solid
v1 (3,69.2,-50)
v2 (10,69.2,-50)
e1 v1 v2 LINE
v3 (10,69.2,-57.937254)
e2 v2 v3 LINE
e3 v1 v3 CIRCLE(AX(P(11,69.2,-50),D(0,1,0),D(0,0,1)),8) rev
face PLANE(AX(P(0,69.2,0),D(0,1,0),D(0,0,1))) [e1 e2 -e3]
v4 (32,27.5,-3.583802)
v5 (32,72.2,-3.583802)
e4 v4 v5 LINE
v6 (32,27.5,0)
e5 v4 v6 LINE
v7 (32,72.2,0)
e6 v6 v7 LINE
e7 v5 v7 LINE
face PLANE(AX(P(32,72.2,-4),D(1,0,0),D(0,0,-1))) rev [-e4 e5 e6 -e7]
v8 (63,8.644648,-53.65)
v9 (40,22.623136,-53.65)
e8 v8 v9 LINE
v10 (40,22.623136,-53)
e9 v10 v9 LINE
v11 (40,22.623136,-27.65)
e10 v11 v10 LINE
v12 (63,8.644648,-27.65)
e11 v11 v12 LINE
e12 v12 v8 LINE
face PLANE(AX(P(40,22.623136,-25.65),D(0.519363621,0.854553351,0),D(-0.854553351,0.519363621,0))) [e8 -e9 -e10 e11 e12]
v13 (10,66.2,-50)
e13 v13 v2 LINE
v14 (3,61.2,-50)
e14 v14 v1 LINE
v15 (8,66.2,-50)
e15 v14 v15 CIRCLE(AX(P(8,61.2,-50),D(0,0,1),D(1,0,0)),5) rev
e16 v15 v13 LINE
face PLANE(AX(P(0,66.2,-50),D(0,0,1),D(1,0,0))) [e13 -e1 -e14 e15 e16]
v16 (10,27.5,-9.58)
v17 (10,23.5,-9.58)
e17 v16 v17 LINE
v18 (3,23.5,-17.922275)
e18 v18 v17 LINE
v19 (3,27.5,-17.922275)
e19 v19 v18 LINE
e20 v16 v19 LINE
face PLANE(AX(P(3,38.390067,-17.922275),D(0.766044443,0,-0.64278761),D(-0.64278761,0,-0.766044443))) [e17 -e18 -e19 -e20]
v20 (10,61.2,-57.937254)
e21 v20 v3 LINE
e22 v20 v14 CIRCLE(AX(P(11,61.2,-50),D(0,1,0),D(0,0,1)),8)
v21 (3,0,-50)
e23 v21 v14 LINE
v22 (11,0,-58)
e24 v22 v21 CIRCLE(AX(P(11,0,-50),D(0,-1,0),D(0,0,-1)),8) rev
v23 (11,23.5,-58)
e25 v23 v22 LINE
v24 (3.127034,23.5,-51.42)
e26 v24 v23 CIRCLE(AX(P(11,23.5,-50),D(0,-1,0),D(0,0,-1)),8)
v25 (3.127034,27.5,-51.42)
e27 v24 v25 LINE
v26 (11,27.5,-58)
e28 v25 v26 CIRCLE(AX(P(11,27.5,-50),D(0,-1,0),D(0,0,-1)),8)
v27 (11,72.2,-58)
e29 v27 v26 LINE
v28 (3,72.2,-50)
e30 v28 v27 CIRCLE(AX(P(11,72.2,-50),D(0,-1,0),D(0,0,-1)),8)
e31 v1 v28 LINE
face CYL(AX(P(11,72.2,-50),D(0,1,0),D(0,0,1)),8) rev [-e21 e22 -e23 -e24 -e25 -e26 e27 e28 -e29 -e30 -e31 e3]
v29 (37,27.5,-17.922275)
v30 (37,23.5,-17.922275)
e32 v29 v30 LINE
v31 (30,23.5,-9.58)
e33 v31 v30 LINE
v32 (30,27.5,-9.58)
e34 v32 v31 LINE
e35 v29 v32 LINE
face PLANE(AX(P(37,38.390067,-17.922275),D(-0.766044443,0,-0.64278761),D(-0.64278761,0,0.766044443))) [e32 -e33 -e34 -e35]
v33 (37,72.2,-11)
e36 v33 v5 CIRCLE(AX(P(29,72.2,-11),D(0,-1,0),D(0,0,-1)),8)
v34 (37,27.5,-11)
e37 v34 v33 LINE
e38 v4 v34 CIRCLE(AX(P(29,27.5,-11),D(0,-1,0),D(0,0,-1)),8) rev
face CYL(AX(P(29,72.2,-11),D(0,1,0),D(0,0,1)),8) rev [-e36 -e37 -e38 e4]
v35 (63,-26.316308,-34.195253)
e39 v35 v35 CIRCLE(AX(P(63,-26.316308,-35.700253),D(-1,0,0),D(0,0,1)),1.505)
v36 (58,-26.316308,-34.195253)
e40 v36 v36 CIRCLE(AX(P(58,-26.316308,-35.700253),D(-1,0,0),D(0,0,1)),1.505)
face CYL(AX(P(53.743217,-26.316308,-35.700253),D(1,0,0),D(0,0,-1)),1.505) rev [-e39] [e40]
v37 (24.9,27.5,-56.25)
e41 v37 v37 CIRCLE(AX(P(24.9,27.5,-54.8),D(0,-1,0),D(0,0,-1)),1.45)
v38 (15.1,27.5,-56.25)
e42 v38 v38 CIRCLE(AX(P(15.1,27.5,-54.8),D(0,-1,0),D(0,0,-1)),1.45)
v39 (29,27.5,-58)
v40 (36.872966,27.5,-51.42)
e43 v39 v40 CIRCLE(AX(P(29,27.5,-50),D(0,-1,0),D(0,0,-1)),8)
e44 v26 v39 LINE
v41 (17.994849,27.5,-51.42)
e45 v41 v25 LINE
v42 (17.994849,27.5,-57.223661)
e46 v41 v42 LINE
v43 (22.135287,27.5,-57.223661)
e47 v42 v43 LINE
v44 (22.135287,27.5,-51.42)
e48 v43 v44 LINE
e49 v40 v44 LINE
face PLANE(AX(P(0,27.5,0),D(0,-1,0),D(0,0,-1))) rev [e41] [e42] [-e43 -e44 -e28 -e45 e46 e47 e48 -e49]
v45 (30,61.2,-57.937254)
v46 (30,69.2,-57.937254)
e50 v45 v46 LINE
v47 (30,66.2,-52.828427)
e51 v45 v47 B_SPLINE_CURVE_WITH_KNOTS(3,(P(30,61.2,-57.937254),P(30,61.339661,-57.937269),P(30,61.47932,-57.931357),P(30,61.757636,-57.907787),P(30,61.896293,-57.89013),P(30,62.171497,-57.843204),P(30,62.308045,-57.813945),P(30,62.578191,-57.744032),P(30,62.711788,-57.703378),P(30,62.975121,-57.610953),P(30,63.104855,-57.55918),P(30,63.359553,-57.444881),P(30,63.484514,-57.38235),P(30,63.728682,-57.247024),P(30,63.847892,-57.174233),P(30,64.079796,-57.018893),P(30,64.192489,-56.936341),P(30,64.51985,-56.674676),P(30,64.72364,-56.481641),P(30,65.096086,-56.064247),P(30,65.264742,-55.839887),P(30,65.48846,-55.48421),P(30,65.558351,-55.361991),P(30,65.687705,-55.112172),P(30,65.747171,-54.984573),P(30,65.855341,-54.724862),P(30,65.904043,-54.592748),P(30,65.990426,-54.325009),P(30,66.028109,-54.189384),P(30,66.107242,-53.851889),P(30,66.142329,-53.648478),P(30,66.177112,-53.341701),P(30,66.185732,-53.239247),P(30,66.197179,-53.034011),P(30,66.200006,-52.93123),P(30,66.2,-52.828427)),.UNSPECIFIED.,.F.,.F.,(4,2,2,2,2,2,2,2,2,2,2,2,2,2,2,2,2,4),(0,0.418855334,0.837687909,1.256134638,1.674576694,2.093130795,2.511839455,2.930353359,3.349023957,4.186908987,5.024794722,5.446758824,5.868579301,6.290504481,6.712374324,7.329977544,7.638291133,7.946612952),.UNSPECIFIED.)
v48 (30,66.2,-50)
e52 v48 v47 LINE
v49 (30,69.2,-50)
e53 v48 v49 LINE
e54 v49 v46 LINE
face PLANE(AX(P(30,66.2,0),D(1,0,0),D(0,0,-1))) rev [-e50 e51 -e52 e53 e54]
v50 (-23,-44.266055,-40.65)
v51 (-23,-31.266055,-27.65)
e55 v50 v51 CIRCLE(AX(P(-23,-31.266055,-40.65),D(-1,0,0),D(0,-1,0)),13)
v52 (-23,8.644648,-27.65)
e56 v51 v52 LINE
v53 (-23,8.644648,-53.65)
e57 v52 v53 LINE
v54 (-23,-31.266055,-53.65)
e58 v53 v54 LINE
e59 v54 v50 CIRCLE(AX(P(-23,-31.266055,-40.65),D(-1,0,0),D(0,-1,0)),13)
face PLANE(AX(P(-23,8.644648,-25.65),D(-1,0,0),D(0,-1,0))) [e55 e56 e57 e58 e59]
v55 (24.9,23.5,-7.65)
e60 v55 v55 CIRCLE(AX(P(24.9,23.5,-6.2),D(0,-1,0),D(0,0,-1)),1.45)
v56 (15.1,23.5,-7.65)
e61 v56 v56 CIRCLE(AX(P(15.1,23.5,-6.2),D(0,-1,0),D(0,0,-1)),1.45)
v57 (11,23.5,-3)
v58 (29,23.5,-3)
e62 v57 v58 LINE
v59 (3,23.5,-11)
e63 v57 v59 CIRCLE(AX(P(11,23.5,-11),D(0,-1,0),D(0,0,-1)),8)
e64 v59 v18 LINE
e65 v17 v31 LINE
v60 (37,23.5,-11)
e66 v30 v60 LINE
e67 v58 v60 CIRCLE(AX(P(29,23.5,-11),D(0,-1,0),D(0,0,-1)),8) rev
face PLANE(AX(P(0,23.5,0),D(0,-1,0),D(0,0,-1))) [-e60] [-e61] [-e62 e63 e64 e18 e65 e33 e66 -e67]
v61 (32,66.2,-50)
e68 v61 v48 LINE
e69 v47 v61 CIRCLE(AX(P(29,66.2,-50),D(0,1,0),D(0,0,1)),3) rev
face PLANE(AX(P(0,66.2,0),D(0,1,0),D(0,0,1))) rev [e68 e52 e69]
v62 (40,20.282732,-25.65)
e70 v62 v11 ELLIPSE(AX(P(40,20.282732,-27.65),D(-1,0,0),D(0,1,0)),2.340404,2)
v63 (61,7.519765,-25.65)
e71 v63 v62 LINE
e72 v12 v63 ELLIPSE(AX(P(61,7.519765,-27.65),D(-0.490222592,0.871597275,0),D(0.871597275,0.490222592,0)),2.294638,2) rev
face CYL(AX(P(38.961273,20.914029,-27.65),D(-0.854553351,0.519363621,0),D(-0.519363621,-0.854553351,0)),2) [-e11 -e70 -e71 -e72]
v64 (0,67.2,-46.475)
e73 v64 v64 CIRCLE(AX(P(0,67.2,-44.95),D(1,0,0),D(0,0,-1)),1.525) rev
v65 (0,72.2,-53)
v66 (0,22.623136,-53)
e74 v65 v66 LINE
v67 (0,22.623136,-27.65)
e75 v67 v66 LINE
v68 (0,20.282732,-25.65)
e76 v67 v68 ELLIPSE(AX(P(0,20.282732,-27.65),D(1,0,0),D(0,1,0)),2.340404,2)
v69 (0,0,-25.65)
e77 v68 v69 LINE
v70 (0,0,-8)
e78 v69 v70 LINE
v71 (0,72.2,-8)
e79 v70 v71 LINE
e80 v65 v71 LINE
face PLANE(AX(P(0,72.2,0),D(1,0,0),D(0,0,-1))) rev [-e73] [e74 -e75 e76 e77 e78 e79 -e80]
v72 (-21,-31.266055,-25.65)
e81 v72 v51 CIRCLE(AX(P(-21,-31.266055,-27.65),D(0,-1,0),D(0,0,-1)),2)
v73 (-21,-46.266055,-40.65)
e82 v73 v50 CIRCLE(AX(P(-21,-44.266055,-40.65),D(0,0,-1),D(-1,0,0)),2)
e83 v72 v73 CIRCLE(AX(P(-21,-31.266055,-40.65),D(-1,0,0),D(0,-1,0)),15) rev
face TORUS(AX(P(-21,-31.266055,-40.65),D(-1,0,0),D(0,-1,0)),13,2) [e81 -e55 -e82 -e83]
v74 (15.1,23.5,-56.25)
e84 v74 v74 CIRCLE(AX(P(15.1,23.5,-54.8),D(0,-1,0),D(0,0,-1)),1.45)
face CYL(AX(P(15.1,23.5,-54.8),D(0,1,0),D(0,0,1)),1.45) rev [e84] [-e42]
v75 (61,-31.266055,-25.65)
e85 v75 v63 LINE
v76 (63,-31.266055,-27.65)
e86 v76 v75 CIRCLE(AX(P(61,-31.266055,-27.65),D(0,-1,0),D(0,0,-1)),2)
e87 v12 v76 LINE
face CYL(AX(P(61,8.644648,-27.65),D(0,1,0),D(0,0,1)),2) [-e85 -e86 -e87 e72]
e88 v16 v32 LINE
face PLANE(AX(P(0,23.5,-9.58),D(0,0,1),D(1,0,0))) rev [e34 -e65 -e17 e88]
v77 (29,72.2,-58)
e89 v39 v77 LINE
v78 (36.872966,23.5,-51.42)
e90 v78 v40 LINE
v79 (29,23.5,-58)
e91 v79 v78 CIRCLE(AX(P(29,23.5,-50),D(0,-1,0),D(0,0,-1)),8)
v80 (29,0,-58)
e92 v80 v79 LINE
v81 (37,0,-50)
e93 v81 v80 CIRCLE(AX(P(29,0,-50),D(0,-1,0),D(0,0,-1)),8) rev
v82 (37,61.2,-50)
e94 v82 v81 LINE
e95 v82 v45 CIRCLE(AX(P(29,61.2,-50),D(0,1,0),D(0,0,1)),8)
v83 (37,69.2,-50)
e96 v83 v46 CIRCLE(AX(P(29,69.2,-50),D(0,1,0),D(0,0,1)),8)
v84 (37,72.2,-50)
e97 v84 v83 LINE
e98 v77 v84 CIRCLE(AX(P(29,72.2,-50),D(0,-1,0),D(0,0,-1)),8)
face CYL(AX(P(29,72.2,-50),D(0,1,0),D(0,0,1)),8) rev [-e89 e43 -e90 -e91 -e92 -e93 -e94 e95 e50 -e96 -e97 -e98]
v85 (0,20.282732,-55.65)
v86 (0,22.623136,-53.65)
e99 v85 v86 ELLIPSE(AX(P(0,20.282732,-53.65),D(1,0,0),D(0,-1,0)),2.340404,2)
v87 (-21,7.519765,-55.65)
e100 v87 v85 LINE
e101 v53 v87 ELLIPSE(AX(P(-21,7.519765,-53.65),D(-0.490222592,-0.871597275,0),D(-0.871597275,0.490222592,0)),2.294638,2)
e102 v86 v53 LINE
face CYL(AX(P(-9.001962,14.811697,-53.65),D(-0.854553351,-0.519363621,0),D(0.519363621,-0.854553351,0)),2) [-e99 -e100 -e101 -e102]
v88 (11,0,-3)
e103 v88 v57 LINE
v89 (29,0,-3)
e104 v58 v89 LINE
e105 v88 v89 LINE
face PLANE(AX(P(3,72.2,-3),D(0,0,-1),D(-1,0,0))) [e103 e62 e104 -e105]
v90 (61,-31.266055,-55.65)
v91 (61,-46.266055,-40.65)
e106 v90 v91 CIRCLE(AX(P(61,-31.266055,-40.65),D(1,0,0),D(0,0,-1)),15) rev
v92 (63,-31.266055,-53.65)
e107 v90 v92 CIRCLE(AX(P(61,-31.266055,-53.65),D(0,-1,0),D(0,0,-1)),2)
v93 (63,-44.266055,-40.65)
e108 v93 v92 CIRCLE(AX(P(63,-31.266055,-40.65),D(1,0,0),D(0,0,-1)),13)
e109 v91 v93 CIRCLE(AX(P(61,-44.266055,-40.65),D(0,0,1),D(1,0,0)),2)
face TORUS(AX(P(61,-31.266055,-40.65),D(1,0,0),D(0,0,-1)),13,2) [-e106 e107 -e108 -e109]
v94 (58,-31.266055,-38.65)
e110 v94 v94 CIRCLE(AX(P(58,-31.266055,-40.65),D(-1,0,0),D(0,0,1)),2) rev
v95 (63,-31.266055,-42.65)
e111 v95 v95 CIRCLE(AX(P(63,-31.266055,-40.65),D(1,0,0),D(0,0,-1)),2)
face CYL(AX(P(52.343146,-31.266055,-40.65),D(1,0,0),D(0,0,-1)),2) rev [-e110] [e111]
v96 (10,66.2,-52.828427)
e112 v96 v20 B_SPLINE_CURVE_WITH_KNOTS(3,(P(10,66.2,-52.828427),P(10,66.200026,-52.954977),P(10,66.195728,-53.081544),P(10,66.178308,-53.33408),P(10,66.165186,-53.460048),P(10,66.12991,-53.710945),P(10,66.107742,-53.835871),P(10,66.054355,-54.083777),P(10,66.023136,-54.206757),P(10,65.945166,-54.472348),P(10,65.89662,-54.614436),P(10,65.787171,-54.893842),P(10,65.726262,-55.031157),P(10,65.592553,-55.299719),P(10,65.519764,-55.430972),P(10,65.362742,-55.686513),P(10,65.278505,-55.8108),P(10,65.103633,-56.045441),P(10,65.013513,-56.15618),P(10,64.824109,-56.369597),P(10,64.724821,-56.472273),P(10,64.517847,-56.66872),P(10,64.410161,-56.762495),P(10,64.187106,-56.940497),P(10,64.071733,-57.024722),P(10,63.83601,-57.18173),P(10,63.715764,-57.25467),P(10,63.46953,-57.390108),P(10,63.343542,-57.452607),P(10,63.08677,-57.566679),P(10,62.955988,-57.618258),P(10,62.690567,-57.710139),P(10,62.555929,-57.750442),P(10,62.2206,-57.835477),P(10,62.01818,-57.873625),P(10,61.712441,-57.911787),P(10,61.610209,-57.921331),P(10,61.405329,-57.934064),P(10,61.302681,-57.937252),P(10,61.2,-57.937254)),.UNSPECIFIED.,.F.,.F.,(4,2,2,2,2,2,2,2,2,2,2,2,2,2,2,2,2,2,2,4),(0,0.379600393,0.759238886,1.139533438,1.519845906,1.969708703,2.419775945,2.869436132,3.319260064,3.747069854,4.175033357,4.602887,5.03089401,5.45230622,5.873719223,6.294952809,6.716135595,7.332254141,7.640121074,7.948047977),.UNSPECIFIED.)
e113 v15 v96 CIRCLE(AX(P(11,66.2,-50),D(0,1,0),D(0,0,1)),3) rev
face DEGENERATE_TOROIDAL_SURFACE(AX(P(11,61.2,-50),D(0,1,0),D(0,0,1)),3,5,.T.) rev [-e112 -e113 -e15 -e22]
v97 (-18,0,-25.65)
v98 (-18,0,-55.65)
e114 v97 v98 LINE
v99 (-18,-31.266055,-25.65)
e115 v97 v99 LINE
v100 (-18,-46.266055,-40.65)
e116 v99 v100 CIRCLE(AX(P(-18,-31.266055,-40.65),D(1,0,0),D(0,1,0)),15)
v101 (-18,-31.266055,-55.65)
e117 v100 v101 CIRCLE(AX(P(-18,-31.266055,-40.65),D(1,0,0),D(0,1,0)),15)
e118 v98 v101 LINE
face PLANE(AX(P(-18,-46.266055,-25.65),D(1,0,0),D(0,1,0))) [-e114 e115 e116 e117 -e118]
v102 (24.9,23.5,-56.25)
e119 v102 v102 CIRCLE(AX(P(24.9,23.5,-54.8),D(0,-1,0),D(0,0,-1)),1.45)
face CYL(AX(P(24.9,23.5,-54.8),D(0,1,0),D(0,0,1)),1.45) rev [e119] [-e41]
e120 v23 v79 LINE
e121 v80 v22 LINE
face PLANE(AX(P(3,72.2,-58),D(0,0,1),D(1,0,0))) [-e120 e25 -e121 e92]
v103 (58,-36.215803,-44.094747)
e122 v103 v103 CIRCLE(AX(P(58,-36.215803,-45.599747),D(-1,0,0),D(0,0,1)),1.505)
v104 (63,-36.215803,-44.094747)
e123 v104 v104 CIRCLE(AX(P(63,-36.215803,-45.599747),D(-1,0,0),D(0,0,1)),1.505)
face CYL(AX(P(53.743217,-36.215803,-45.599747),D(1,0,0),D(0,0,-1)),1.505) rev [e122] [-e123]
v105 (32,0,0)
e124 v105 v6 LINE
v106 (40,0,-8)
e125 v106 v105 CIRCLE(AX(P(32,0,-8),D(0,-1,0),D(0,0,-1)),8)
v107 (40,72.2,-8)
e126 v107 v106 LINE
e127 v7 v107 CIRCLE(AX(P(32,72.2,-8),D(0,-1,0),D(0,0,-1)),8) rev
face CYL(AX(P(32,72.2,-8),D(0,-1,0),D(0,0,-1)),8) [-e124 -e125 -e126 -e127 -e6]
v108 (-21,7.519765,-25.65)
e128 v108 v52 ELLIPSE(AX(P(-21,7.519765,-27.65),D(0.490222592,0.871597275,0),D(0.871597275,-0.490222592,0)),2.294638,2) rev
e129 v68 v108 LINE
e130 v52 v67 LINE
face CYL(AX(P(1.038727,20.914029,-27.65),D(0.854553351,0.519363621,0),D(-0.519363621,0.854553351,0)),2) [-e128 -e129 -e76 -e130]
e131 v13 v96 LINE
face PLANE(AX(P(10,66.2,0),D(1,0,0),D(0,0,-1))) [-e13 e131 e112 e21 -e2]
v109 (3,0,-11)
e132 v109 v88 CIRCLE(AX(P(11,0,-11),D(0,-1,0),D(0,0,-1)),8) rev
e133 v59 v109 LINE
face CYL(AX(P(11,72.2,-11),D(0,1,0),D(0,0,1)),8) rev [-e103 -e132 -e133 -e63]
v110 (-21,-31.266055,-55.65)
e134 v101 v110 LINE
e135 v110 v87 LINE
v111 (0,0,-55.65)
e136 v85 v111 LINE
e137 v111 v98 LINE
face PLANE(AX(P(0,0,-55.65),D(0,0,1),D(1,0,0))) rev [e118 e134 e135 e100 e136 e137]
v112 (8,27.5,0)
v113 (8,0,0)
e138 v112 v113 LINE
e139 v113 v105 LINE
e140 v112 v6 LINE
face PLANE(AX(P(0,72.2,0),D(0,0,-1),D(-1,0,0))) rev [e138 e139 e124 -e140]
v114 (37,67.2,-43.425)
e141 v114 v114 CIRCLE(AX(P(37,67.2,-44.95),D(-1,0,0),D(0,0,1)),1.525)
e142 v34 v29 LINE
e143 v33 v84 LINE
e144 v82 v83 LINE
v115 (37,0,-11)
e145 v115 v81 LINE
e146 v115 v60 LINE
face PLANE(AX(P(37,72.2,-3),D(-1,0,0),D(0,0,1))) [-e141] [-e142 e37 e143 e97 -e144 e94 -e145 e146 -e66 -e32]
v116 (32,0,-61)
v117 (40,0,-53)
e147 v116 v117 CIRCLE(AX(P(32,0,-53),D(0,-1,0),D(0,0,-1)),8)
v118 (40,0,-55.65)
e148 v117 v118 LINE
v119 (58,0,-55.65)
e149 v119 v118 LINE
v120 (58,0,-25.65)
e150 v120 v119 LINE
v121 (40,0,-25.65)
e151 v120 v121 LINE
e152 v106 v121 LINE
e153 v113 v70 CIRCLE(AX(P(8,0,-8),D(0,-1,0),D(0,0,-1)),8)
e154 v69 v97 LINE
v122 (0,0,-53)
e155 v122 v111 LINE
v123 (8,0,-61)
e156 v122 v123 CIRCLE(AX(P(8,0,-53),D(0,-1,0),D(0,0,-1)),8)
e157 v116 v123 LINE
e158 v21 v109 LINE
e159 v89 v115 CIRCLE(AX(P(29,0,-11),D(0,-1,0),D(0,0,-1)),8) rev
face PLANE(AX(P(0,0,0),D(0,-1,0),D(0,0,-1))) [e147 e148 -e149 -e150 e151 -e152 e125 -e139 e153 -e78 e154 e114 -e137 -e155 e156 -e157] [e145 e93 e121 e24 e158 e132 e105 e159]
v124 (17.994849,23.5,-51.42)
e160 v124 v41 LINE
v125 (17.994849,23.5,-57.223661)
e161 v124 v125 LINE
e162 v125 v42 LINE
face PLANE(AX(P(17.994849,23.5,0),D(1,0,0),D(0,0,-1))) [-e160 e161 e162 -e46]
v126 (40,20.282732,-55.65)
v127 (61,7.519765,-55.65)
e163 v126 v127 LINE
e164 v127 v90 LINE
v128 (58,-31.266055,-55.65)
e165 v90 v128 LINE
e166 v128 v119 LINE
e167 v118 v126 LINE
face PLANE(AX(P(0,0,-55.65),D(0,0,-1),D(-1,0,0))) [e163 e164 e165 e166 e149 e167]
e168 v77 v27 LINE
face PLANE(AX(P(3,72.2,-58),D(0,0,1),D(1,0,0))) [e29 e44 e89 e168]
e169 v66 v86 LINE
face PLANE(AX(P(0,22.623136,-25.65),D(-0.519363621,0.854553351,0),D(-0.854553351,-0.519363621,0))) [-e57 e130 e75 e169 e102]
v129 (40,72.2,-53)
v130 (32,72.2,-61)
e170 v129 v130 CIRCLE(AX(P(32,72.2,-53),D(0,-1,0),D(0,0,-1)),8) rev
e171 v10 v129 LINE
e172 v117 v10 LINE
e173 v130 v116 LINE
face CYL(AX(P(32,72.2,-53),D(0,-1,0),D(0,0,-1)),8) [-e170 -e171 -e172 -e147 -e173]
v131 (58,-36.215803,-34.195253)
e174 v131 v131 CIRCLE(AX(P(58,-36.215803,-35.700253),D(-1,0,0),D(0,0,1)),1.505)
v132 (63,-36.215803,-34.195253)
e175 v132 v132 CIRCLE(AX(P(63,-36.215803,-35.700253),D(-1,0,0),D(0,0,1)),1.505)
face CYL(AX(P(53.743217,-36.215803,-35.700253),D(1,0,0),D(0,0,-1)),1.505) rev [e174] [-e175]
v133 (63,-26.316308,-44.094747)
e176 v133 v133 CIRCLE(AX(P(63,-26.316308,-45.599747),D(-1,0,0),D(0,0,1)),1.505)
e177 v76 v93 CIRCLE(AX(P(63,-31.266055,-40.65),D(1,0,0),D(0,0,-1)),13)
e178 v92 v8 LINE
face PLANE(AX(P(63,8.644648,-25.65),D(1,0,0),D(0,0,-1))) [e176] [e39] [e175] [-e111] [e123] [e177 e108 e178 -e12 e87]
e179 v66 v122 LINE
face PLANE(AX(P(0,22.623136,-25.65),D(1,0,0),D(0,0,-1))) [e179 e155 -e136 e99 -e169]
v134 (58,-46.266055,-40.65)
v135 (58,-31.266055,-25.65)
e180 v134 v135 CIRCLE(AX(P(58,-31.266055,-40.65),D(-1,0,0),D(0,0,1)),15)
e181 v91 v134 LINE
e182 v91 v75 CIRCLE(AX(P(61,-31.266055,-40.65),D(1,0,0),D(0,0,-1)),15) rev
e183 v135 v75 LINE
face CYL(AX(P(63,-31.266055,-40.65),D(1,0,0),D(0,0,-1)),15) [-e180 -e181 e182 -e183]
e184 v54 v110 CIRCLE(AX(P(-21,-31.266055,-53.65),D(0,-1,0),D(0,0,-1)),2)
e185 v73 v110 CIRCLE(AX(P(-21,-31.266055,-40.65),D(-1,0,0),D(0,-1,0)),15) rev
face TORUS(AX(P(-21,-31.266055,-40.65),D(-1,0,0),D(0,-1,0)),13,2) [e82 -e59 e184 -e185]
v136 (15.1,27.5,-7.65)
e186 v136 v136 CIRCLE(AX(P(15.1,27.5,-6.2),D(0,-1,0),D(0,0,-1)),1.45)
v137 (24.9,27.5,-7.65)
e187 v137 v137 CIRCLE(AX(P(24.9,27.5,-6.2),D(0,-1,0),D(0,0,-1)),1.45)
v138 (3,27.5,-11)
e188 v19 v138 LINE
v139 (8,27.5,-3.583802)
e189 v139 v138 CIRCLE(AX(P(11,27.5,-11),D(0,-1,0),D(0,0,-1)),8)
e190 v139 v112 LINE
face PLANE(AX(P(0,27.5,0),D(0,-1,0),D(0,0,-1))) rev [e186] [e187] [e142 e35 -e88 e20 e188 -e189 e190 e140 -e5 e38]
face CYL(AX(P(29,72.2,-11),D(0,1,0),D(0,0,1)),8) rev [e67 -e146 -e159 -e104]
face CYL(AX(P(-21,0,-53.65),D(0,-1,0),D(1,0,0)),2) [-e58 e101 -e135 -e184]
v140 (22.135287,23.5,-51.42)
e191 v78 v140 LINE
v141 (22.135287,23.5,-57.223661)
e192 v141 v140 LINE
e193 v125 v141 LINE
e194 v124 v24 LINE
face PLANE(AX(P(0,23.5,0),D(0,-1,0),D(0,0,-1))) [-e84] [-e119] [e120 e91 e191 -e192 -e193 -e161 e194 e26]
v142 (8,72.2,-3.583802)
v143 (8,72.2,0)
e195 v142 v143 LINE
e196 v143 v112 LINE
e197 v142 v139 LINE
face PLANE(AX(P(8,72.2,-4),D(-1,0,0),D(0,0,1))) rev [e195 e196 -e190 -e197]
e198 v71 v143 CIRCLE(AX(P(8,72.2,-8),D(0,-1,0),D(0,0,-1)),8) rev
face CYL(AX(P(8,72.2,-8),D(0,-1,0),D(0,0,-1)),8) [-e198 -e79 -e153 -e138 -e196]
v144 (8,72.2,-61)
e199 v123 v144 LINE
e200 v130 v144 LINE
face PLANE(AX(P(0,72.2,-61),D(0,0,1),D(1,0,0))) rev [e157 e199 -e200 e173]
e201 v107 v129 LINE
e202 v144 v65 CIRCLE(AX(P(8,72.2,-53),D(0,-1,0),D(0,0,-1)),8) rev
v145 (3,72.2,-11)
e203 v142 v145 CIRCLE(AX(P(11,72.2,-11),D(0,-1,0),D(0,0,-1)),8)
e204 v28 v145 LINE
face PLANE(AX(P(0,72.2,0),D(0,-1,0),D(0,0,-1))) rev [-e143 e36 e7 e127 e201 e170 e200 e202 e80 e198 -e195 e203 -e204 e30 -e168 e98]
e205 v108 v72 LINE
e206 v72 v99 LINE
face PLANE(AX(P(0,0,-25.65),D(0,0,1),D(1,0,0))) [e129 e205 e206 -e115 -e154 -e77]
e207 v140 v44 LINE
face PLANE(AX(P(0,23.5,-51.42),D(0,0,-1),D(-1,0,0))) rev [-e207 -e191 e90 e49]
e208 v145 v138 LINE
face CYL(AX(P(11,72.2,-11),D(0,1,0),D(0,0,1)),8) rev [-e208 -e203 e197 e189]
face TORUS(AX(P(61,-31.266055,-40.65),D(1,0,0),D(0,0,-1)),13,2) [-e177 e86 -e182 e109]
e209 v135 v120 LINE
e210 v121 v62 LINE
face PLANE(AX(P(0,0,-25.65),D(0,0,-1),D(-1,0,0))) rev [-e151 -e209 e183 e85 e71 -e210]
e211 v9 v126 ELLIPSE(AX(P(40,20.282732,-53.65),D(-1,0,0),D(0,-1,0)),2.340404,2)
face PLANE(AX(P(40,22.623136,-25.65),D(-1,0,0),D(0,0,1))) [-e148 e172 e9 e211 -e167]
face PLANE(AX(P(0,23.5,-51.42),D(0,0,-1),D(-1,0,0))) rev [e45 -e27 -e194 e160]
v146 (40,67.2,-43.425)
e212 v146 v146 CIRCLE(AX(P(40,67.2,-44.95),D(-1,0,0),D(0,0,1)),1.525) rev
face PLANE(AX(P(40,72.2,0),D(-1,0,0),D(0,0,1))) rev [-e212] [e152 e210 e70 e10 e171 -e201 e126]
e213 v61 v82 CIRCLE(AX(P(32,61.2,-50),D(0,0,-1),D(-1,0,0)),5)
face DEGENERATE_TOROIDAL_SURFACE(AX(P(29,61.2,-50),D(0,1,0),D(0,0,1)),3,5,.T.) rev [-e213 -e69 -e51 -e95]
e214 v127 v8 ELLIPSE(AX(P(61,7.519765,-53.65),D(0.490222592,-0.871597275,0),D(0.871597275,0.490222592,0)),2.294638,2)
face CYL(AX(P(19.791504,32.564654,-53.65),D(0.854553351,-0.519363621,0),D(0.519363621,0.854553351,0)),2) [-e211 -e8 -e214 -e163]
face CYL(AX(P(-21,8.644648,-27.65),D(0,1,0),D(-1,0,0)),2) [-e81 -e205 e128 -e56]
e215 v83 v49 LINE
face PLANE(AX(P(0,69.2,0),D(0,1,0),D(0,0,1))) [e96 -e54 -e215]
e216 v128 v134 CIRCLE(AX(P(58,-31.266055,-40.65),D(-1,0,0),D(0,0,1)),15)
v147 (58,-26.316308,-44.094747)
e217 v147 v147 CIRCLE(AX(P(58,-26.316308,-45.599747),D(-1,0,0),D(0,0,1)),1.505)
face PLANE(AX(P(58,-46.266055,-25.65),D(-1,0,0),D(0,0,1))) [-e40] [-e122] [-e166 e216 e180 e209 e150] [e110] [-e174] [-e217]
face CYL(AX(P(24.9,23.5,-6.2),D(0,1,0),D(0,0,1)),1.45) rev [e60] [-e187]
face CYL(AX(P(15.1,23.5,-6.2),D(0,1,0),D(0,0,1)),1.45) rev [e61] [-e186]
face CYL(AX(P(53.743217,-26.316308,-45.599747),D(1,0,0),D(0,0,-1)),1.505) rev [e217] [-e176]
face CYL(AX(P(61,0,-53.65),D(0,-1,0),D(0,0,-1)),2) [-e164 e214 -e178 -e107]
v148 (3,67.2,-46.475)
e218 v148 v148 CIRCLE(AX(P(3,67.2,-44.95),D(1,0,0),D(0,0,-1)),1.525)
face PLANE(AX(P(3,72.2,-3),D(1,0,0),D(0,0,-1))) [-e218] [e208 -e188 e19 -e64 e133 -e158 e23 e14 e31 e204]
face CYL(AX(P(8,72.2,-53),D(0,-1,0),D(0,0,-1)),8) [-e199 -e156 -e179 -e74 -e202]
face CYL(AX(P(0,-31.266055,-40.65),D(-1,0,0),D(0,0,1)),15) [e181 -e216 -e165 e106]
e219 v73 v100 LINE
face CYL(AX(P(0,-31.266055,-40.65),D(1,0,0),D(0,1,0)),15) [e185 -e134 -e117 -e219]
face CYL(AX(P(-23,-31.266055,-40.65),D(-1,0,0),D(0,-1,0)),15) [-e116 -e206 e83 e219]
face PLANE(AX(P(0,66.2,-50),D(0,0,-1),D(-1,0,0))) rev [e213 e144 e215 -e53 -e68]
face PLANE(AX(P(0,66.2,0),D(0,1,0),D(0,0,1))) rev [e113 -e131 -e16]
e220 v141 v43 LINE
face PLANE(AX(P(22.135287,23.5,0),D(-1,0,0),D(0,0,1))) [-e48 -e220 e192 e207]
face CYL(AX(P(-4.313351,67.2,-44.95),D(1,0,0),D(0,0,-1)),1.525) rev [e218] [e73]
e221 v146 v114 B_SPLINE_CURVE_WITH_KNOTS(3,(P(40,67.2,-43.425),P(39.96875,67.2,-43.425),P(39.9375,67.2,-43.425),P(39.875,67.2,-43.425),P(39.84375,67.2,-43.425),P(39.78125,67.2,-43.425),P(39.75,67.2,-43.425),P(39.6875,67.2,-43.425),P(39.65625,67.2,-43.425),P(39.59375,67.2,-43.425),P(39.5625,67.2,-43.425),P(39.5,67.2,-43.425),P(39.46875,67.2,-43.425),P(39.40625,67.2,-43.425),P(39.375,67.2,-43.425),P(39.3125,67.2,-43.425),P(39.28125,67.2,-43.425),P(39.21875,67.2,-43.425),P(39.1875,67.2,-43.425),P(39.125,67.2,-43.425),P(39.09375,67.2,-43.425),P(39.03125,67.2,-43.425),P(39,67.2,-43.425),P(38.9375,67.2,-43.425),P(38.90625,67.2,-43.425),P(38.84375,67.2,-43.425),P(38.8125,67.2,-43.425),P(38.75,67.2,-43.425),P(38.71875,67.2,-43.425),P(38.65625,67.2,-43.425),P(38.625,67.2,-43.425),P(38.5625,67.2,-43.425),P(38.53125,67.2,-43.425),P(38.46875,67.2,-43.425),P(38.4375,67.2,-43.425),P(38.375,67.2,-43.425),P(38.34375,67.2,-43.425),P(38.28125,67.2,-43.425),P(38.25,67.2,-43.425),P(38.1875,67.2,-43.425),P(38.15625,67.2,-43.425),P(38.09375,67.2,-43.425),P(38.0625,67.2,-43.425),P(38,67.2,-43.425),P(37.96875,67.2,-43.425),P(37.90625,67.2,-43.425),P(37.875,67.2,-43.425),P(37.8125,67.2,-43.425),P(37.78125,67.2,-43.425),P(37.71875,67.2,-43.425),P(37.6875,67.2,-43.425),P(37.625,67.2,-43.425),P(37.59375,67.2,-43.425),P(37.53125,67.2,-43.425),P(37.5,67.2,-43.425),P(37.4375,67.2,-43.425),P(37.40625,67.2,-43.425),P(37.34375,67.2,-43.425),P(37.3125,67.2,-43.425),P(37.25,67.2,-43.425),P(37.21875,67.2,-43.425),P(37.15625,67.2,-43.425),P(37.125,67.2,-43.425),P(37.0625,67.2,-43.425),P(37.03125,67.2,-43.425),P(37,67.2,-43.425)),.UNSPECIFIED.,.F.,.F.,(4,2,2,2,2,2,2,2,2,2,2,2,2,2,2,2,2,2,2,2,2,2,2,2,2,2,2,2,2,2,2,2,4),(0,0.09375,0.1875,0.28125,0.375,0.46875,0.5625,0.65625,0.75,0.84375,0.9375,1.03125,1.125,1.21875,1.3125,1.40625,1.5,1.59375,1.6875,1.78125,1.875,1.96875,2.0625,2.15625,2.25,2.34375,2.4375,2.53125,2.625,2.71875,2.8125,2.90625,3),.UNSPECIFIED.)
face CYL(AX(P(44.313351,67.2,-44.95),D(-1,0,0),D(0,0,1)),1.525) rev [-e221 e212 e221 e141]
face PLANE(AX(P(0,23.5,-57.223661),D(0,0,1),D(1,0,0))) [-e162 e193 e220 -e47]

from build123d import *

# Parameters (mm, degrees)
SKETCH1_W           = 40
SKETCH1_H           = 61
SKETCH1_W_2         = 34
SKETCH1_H_2         = 55
BOSS_EXTRUDE1_DEPTH = 72.2
FILLET1_R           = 8
FILLET2_R           = 8
SKETCH2_R           = 1.45
BOSS_EXTRUDE2_DEPTH = 4
SKETCH3_W           = 24
SKETCH3_H           = 44.7
CUT_EXTRUDE1_DEPTH  = 4
BOSS_EXTRUDE3_DEPTH = 30
FILLET3_R           = 15
FILLET4_R           = 15
SKETCH6_R           = 2
CUT_EXTRUDE2_DEPTH  = 5
SKETCH8_R           = 1.505
CUT_EXTRUDE3_DEPTH  = 5
FILLET5_R           = 2
BOSS_EXTRUDE5_DEPTH = 3
FILLET7_R           = 5
SKETCH12_R          = 1.525
CUT_EXTRUDE4_DEPTH  = 3
CUT_EXTRUDE5_START  = -3
SKETCH13_R          = 1.525
CUT_EXTRUDE5_DEPTH  = 3
BOSS_EXTRUDE6_DEPTH = 4


with BuildPart() as part:
    # Sketch1 → Boss-Extrude1 (new body)
    with BuildSketch(Plane(origin=(0, 0, 0), x_dir=(1, 0, 0), z_dir=(0, 1, 0))):
        with Locations((20, 30.5)):
            Rectangle(SKETCH1_W, SKETCH1_H)
        with Locations((20, 30.5)):
            Rectangle(SKETCH1_W_2, SKETCH1_H_2, mode=Mode.SUBTRACT)
    extrude(amount=BOSS_EXTRUDE1_DEPTH)

    # Fillet1
    fillet1_edges = [part.edges().sort_by_distance(p)[0] for p in [
        (37, 36.1, -3),
        (37, 36.1, -58),
        (3, 36.1, -58),
        (3, 36.1, -3),
    ]]
    fillet(fillet1_edges, radius=FILLET1_R)

    # Fillet2
    fillet2_edges = [part.edges().sort_by_distance(p)[0] for p in [
        (0, 36.1, -61),
        (40, 36.1, -61),
        (40, 36.1, 0),
        (0, 36.1, 0),
    ]]
    fillet(fillet2_edges, radius=FILLET2_R)

    # Sketch2 → Boss-Extrude2 (add)
    # profile 1 of 2: a face of its own
    with BuildSketch(Plane(origin=(0, 27.5, 0), x_dir=(-1, 0, 0), z_dir=(0, -1, 0))):
        with BuildLine():
            ThreePointArc((-3.127033596, 51.42), (-5.869697865, 56.138403701), (-11, 58))
            Line((-11, 58), (-29, 58))
            ThreePointArc((-29, 58), (-34.130302135, 56.138403701), (-36.872966404, 51.42))
            Line((-36.872966404, 51.42), (-22.135286633, 51.42))
            Line((-22.135286633, 51.42), (-22.135286633, 57.223660853))
            Line((-22.135286633, 57.223660853), (-17.994848526, 57.223660853))
            Line((-17.994848526, 57.223660853), (-17.994848526, 51.42))
            Line((-17.994848526, 51.42), (-3.127033596, 51.42))
        make_face()
        with Locations(Location((-24.9, 54.8, 0), (0, 0, 90))):
            Circle(SKETCH2_R, mode=Mode.SUBTRACT)
        with Locations(Location((-15.1, 54.8, 0), (0, 0, 90))):
            Circle(SKETCH2_R, mode=Mode.SUBTRACT)
    # profile 2 of 2: a face of its own
    with BuildSketch(Plane(origin=(0, 27.5, 0), x_dir=(-1, 0, 0), z_dir=(0, -1, 0))):
        with BuildLine():
            ThreePointArc((-29, 3), (-34.130302135, 4.861596299), (-36.872966404, 9.58))
            Line((-36.872966404, 9.58), (-3.127033596, 9.58))
            ThreePointArc((-3.127033596, 9.58), (-5.869697865, 4.861596299), (-11, 3))
            Line((-11, 3), (-29, 3))
        make_face()
        with Locations(Location((-24.9, 6.2, 0), (0, 0, 90))):
            Circle(SKETCH2_R, mode=Mode.SUBTRACT)
        with Locations(Location((-15.1, 6.2, 0), (0, 0, 90))):
            Circle(SKETCH2_R, mode=Mode.SUBTRACT)
    extrude(amount=BOSS_EXTRUDE2_DEPTH)

    # Sketch3 → Cut-Extrude1 (cut)
    with BuildSketch(Plane.XY):
        with Locations((20, 49.85)):
            Rectangle(SKETCH3_W, SKETCH3_H)
    extrude(amount=-CUT_EXTRUDE1_DEPTH, mode=Mode.SUBTRACT)

    # Sketch5 → Boss-Extrude3 (add)
    with BuildSketch(Plane(origin=(0, 0, -55.65), x_dir=(-1, 0, 0), z_dir=(0, 0, -1))):
        Polygon((-40, 22.623135631), (-63, 8.644648184), (-63, -46.266055448), (-58, -46.266055448), (-58, 0), (-40, 0), align=None)
        Polygon((0, 22.623135631), (0, 0), (18, 0), (18, -46.266055448), (23, -46.266055448), (23, 8.644648184), align=None)
    extrude(amount=-BOSS_EXTRUDE3_DEPTH)

    # Fillet3
    fillet3_edges = [part.edges().sort_by_distance(p)[0] for p in [
        (60.5, -46.266055448, -55.65),
        (60.5, -46.266055448, -25.65),
    ]]
    fillet(fillet3_edges, radius=FILLET3_R - 0.0001)  # a hair under: the kernel refuses the full size

    # Fillet4
    fillet4_edges = [part.edges().sort_by_distance(p)[0] for p in [
        (-20.5, -46.266055448, -25.65),
        (-20.5, -46.266055448, -55.65),
    ]]
    fillet(fillet4_edges, radius=FILLET4_R - 0.0001)  # a hair under: the kernel refuses the full size

    # Sketch6 → Cut-Extrude2 (cut)
    with BuildSketch(Plane(origin=(63, 0, 0), x_dir=(0, 0, -1), z_dir=(1, 0, 0))):
        with Locations((40.65, -31.266055448)):
            Circle(SKETCH6_R)
    extrude(amount=-CUT_EXTRUDE2_DEPTH, mode=Mode.SUBTRACT)

    # Sketch8 → Cut-Extrude3 (cut)
    with BuildSketch(Plane(origin=(63, 0, -67), x_dir=(0, 0, 1), z_dir=(-1, 0, 0))):
        with Locations((31.299747468, -26.316307979)):
            Circle(SKETCH8_R)
        with Locations((21.400252532, -26.316307979)):
            Circle(SKETCH8_R)
        with Locations((21.400252532, -36.215802916)):
            Circle(SKETCH8_R)
        with Locations((31.299747468, -36.215802916)):
            Circle(SKETCH8_R)
    extrude(amount=CUT_EXTRUDE3_DEPTH, mode=Mode.SUBTRACT)

    # Fillet5
    fillet5_edges = [part.edges().sort_by_distance(p)[0] for p in [
        (63, -11.310753632, -25.65),
        (51.5, 15.633891908, -25.65),
        (51.5, 15.633891908, -55.65),
        (63, -11.310753632, -55.65),
        (-11.5, 15.633891908, -25.65),
        (-11.5, 15.633891908, -55.65),
        (63, -41.872686455, -30.043368993),
        (63, -41.872686455, -51.256631007),
        (-23, -11.310753632, -55.65),
        (-23, -11.310753632, -25.65),
        (-23, -41.872686455, -51.256631007),
        (-23, -41.872686455, -30.043368993),
    ]]
    fillet(fillet5_edges, radius=FILLET5_R)

    # Sketch11 → Boss-Extrude5 (add)
    with BuildSketch(Plane(origin=(0, 69.2, 0), x_dir=(1, 0, 0), z_dir=(0, 1, 0))):
        with BuildLine():
            ThreePointArc((10, 57.937253933), (5, 55.291502622), (3, 50))
            Line((3, 50), (10, 50))
            Line((10, 50), (10, 57.937253933))
        make_face()
        with BuildLine():
            Line((30, 50), (37, 50))
            ThreePointArc((37, 50), (35, 55.291502622), (30, 57.937253933))
            Line((30, 57.937253933), (30, 50))
        make_face()
    extrude(amount=-BOSS_EXTRUDE5_DEPTH)

    # Fillet7
    fillet7_edges = [part.edges().sort_by_distance(p)[0] for p in [
        (5, 66.2, -55.291502622),
        (35, 66.2, -55.291502622),
    ]]
    fillet(fillet7_edges, radius=FILLET7_R)

    # Sketch12 → Cut-Extrude4 (cut)
    with BuildSketch(Plane(origin=(3, 0, 0), x_dir=(0, 0, -1), z_dir=(1, 0, 0))):
        with Locations((44.95, 67.2)):
            Circle(SKETCH12_R)
    extrude(amount=-CUT_EXTRUDE4_DEPTH, mode=Mode.SUBTRACT)

    # Sketch13 → Cut-Extrude5 (cut)
    with BuildSketch(Plane.ZY.offset(-37).offset(CUT_EXTRUDE5_START)):
        with Locations(Location((-44.95, 67.2, 0), (0, 0, 180))):
            Circle(SKETCH13_R)
    extrude(amount=CUT_EXTRUDE5_DEPTH, mode=Mode.SUBTRACT)

    # Sketch14 → Boss-Extrude6 (add)
    with BuildSketch(Plane.XZ.offset(-23.5)):
        Polygon((3, -17.922275148), (10, -9.58), (3, -9.58), align=None)
        Polygon((37, -17.922275148), (30, -9.58), (37, -9.58), align=None)
    extrude(amount=-BOSS_EXTRUDE6_DEPTH)


solid = part.part
